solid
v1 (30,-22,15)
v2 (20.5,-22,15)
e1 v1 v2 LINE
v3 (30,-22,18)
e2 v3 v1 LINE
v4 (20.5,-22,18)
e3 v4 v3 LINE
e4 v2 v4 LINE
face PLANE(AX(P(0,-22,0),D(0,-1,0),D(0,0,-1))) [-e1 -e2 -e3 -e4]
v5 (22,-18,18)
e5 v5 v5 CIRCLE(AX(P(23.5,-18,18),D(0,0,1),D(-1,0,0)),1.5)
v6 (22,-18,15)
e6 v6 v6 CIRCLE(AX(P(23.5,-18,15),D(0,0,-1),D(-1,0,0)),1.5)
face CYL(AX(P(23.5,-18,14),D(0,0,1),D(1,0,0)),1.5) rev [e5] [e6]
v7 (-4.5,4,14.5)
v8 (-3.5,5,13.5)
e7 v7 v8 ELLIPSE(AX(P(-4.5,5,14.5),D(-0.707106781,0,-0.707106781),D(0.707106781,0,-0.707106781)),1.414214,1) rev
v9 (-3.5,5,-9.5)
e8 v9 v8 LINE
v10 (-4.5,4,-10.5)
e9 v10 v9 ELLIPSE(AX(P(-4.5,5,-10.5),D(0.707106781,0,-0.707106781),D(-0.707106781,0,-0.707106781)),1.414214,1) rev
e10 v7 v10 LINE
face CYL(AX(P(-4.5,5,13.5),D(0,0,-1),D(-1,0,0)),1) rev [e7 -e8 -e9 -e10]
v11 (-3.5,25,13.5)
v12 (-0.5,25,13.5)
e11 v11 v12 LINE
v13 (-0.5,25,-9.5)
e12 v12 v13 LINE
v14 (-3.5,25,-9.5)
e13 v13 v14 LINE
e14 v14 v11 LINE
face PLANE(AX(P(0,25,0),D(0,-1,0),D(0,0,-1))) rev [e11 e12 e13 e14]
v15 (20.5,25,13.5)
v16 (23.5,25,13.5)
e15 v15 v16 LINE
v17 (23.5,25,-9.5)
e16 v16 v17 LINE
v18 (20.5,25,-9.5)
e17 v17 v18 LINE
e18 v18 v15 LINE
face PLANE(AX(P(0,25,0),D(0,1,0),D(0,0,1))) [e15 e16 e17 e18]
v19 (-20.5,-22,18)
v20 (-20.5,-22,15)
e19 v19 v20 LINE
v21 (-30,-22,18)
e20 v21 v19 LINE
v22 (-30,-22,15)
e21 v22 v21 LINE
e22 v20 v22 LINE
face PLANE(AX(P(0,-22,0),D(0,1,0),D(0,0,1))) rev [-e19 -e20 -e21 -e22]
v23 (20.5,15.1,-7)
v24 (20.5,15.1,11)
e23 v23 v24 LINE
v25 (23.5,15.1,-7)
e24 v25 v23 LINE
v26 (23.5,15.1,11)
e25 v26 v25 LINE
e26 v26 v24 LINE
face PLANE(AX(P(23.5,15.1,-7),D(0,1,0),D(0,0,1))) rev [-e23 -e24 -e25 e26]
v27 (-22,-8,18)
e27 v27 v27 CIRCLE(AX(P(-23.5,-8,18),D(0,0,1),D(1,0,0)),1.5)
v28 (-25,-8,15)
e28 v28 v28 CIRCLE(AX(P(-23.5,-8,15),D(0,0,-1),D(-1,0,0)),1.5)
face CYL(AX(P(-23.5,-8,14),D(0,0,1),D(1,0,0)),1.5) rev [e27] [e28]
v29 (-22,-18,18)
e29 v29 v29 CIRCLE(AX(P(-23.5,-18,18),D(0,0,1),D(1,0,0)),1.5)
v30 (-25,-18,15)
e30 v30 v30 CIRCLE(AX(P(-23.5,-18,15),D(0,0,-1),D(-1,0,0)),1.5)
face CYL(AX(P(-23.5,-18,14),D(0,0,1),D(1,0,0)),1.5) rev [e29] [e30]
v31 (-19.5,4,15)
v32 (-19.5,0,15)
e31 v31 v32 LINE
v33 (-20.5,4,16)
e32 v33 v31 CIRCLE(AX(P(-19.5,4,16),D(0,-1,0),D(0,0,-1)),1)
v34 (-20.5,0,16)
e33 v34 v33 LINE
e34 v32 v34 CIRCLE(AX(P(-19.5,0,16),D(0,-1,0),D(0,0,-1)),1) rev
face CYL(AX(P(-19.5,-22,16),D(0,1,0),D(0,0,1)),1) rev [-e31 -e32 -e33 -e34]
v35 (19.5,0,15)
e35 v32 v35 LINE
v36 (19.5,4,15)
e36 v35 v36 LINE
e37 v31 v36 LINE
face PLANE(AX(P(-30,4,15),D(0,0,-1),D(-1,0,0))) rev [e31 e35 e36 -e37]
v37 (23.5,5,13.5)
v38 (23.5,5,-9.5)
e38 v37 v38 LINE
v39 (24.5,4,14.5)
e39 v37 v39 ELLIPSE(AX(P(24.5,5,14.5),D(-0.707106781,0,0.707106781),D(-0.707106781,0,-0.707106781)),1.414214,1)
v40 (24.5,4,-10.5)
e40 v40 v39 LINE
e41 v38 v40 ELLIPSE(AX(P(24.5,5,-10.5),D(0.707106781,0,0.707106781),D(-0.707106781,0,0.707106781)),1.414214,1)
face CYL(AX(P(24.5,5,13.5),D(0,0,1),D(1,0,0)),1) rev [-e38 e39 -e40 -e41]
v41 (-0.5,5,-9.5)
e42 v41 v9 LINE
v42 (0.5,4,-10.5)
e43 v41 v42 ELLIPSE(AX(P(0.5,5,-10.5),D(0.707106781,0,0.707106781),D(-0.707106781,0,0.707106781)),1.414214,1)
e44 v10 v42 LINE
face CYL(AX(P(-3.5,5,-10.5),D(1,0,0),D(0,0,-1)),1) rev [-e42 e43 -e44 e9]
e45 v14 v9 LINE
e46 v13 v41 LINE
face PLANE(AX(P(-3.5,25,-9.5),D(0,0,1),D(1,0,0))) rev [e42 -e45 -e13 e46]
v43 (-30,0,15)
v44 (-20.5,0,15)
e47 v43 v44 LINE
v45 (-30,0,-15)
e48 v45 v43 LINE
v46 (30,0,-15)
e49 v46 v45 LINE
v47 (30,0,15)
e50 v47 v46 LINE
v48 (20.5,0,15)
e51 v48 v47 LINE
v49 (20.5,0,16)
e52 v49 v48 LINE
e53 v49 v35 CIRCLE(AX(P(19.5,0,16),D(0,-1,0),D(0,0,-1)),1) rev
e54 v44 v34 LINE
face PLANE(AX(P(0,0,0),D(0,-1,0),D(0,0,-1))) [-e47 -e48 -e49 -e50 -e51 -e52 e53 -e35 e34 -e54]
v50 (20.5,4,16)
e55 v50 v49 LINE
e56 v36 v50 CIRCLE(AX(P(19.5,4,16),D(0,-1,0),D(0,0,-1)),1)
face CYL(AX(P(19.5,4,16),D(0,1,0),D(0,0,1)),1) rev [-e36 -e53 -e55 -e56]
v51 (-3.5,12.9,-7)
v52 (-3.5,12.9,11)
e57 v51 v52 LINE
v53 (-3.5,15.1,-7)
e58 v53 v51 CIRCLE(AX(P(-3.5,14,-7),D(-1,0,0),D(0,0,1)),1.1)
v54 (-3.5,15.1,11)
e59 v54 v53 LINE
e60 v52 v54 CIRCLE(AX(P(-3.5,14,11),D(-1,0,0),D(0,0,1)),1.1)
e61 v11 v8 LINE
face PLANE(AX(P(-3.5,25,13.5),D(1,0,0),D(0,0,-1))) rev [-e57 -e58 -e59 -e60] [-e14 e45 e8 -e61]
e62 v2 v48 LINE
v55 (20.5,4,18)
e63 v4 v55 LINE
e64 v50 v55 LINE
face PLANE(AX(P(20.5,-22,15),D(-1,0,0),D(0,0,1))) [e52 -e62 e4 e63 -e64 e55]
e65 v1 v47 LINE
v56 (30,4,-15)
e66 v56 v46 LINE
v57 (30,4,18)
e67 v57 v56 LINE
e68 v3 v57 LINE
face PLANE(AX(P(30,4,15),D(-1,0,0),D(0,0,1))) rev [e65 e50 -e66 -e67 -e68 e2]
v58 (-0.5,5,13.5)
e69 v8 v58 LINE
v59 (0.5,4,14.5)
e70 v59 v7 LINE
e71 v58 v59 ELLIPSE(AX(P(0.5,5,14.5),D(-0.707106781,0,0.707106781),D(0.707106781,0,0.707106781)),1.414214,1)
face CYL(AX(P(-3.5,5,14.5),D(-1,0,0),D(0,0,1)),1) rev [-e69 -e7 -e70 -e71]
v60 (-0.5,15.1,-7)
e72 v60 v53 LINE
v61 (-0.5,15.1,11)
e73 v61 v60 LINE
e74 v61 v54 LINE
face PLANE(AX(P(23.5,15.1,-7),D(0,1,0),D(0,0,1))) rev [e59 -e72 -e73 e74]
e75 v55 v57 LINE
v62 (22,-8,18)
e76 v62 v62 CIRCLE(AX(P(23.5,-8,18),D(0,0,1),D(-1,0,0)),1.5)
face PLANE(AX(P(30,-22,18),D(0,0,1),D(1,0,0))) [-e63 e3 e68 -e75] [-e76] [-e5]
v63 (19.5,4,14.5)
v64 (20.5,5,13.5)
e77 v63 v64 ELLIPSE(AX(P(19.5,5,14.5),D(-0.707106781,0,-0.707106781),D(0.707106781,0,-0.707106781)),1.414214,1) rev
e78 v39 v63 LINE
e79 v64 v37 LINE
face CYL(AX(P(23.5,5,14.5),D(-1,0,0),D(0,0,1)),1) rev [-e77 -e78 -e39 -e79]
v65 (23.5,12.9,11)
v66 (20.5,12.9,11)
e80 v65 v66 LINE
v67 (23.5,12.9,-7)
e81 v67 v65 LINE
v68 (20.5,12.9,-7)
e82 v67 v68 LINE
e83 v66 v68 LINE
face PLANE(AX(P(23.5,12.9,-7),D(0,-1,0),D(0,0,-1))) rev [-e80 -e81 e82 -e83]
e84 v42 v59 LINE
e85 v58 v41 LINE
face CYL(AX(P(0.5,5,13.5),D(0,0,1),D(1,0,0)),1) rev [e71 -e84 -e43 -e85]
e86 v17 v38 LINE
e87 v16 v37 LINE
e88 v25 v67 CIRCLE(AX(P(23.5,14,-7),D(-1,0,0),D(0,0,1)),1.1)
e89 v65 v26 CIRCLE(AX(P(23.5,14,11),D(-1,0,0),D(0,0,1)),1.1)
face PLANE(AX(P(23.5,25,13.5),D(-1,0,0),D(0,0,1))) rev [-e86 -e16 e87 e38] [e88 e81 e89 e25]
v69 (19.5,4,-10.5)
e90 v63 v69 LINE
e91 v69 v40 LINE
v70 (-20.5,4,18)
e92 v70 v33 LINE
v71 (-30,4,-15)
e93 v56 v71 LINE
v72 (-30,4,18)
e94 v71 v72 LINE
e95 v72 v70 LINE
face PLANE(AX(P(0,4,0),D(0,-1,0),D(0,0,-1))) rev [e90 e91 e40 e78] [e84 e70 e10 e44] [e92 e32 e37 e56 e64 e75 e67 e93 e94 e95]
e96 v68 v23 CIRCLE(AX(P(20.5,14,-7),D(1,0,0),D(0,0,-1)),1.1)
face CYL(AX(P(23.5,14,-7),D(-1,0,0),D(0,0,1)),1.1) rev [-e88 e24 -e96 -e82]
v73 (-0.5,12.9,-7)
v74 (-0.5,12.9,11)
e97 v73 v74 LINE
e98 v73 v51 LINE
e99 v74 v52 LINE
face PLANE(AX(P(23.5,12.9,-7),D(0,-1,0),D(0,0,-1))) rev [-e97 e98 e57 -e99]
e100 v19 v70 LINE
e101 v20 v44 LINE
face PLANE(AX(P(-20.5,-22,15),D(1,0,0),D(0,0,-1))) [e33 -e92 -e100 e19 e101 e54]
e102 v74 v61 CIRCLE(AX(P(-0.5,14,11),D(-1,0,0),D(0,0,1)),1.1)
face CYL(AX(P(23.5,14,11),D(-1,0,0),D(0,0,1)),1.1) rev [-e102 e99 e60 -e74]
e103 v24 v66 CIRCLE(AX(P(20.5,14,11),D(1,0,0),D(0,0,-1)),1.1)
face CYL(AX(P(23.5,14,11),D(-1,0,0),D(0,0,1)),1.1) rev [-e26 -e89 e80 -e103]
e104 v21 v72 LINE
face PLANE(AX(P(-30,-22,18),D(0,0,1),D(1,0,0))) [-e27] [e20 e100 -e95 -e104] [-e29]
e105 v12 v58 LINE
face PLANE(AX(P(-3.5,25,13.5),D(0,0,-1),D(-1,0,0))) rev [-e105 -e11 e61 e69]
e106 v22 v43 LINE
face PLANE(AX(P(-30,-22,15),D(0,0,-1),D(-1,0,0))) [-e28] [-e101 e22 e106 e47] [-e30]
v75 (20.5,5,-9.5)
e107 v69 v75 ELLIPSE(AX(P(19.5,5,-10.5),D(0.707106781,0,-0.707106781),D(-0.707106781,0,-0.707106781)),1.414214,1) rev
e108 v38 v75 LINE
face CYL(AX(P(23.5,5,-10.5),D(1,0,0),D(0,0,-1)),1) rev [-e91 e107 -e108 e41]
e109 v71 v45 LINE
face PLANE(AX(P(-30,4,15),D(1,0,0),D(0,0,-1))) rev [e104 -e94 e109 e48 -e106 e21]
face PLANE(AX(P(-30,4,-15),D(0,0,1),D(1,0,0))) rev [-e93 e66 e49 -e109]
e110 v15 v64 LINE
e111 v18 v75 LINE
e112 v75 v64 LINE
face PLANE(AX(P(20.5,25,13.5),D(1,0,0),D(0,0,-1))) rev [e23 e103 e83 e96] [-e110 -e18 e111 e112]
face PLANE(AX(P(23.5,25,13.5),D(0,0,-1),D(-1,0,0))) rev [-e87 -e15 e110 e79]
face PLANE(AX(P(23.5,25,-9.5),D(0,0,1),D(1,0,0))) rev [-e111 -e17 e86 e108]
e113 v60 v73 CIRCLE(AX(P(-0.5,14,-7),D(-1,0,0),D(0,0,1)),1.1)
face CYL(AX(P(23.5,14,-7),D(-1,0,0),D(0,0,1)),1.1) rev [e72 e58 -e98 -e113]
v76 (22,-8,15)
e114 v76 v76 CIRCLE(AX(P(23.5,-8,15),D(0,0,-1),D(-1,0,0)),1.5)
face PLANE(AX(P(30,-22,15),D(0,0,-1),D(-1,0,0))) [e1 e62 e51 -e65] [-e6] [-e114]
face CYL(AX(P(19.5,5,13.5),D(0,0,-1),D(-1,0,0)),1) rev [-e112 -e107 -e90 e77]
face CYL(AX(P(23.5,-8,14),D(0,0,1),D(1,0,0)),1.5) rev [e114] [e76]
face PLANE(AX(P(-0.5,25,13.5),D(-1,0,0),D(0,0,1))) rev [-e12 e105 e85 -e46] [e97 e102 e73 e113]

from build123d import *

# Parameters (mm, degrees)
SKETCH1_W           = 60
SKETCH1_H           = 30
BOSS_EXTRUDE1_DEPTH = 4
SKETCH2_W           = 9.5
SKETCH2_H           = 3
BOSS_EXTRUDE2_DEPTH = 26
SKETCH3_R           = 1.5
CUT_EXTRUDE1_DEPTH  = 4
SKETCH4_W           = 3
SKETCH4_H           = 23
BOSS_EXTRUDE4_DEPTH = 21
CUT_EXTRUDE2_DEPTH  = 27
FILLET1_R           = 1


with BuildPart() as part:
    # Sketch1 → Boss-Extrude1 (new body)
    with BuildSketch(Plane(origin=(0, 0, 0), x_dir=(1, 0, 0), z_dir=(0, 1, 0))):
        Rectangle(SKETCH1_W, SKETCH1_H)
    extrude(amount=BOSS_EXTRUDE1_DEPTH)

    # Sketch2 → Boss-Extrude2 (add)
    with BuildSketch(Plane(origin=(0, 4, 0), x_dir=(1, 0, 0), z_dir=(0, 1, 0))):
        with Locations((-25.25, -16.5)):
            Rectangle(SKETCH2_W, SKETCH2_H)
        with Locations((25.25, -16.5)):
            Rectangle(SKETCH2_W, SKETCH2_H)
    extrude(amount=-BOSS_EXTRUDE2_DEPTH)

    # Sketch3 → Cut-Extrude1 (cut)
    with BuildSketch(Plane.XY.offset(18)):
        with Locations((-23.5, -8)):
            Circle(SKETCH3_R)
        with Locations((-23.5, -18)):
            Circle(SKETCH3_R)
        with Locations(Location((23.5, -18, 0), (0, 0, 180))):
            Circle(SKETCH3_R)
        with Locations(Location((23.5, -8, 0), (0, 0, 180))):
            Circle(SKETCH3_R)
    extrude(amount=-CUT_EXTRUDE1_DEPTH, mode=Mode.SUBTRACT)

    # Sketch4 → Boss-Extrude4 (add)
    with BuildSketch(Plane(origin=(0, 4, 0), x_dir=(1, 0, 0), z_dir=(0, 1, 0))):
        with Locations((-2, -2)):
            Rectangle(SKETCH4_W, SKETCH4_H)
        with Locations((22, -2)):
            Rectangle(SKETCH4_W, SKETCH4_H)
    extrude(amount=BOSS_EXTRUDE4_DEPTH)

    # Sketch5 → Cut-Extrude2 (cut)
    with BuildSketch(Plane.ZY.offset(3.5)):
        with BuildLine():
            Line((-7, 15.1), (11, 15.1))
            ThreePointArc((11, 15.1), (12.1, 14), (11, 12.9))
            Line((11, 12.9), (-7, 12.9))
            ThreePointArc((-7, 12.9), (-8.1, 14), (-7, 15.1))
        make_face()
    extrude(amount=-CUT_EXTRUDE2_DEPTH, mode=Mode.SUBTRACT)

    # Fillet1
    # the kernel refuses this fillet: 1 mm, written as the material it adds along each edge
    with BuildSketch(Plane(origin=(-20.5, 4, 15), x_dir=(1, 0, 0), z_dir=(0, -1, 0))) as fillet1_piece_1_section:
        with BuildLine():
            CenterArc((FILLET1_R, FILLET1_R), FILLET1_R, 180, 90)
            Line((0, FILLET1_R), (-FILLET1_R * 0.02, FILLET1_R))
            Line((-FILLET1_R * 0.02, FILLET1_R), (-FILLET1_R * 0.02, -FILLET1_R * 0.02))
            Line((-FILLET1_R * 0.02, -FILLET1_R * 0.02), (FILLET1_R, -FILLET1_R * 0.02))
            Line((FILLET1_R, -FILLET1_R * 0.02), (FILLET1_R, 0))
        make_face()
    fillet1_piece_1 = extrude(amount=4, mode=Mode.PRIVATE)
    fillet1_piece_1 = split(fillet1_piece_1, bisect_by=Plane(origin=(-20.29652687, 2, 15), z_dir=(0, 0, 1)), keep=Keep.TOP, mode=Mode.PRIVATE)
    add(fillet1_piece_1)
    with BuildSketch(Plane(origin=(20.5, 4, 15), x_dir=(-1, 0, 0), z_dir=(0, -1, 0))) as fillet1_piece_2_section:
        with BuildLine():
            CenterArc((FILLET1_R, -FILLET1_R), FILLET1_R, 90, 90)
            Line((0, -FILLET1_R), (-FILLET1_R * 0.02, -FILLET1_R))
            Line((-FILLET1_R * 0.02, -FILLET1_R), (-FILLET1_R * 0.02, FILLET1_R * 0.02))
            Line((-FILLET1_R * 0.02, FILLET1_R * 0.02), (FILLET1_R, FILLET1_R * 0.02))
            Line((FILLET1_R, FILLET1_R * 0.02), (FILLET1_R, 0))
        make_face()
    fillet1_piece_2 = extrude(amount=4, mode=Mode.PRIVATE)
    fillet1_piece_2 = split(fillet1_piece_2, bisect_by=Plane(origin=(20.29652687, 2, 15), z_dir=(0, 0, 1)), keep=Keep.TOP, mode=Mode.PRIVATE)
    add(fillet1_piece_2)
    with BuildSketch(Plane(origin=(-0.5, 4, 13.5), x_dir=(1, 0, 0), z_dir=(0, 0, -1)), Plane(origin=(-3.5, 4, -9.5), x_dir=(-1, 0, 0), z_dir=(0, 0, 1)), Plane(origin=(23.5, 4, 13.5), x_dir=(1, 0, 0), z_dir=(0, 0, -1)), Plane(origin=(20.5, 4, -9.5), x_dir=(-1, 0, 0), z_dir=(0, 0, 1))) as fillet1_piece_3:
        with BuildLine():
            CenterArc((FILLET1_R, -FILLET1_R), FILLET1_R, 90, 90)
            Line((0, -FILLET1_R), (-FILLET1_R * 0.02, -FILLET1_R))
            Line((-FILLET1_R * 0.02, -FILLET1_R), (-FILLET1_R * 0.02, FILLET1_R * 0.02))
            Line((-FILLET1_R * 0.02, FILLET1_R * 0.02), (FILLET1_R, FILLET1_R * 0.02))
            Line((FILLET1_R, FILLET1_R * 0.02), (FILLET1_R, 0))
        make_face()
    extrude(amount=23)
    with BuildSketch(Plane(origin=(-0.5, 4, -9.5), x_dir=(0, 0, -1), z_dir=(-1, 0, 0)), Plane(origin=(-3.5, 4, 13.5), x_dir=(0, 0, 1), z_dir=(1, 0, 0)), Plane(origin=(23.5, 4, -9.5), x_dir=(0, 0, -1), z_dir=(-1, 0, 0)), Plane(origin=(20.5, 4, 13.5), x_dir=(0, 0, 1), z_dir=(1, 0, 0))) as fillet1_piece_4:
        with BuildLine():
            CenterArc((FILLET1_R, -FILLET1_R), FILLET1_R, 90, 90)
            Line((0, -FILLET1_R), (-FILLET1_R * 0.02, -FILLET1_R))
            Line((-FILLET1_R * 0.02, -FILLET1_R), (-FILLET1_R * 0.02, FILLET1_R * 0.02))
            Line((-FILLET1_R * 0.02, FILLET1_R * 0.02), (FILLET1_R, FILLET1_R * 0.02))
            Line((FILLET1_R, FILLET1_R * 0.02), (FILLET1_R, 0))
        make_face()
    extrude(amount=3)
    with BuildSketch(Plane(origin=(-3.5, 4, 13.5), x_dir=(0, 0, 1), z_dir=(1, 0, 0))) as fillet1_piece_5a_section:
        with BuildLine():
            CenterArc((FILLET1_R, -FILLET1_R), FILLET1_R, 90, 90)
            Line((0, -FILLET1_R), (-FILLET1_R * 0.02, -FILLET1_R))
            Line((-FILLET1_R * 0.02, -FILLET1_R), (-FILLET1_R * 0.02, FILLET1_R * 0.02))
            Line((-FILLET1_R * 0.02, FILLET1_R * 0.02), (FILLET1_R, FILLET1_R * 0.02))
            Line((FILLET1_R, FILLET1_R * 0.02), (FILLET1_R, 0))
        make_face()
    fillet1_piece_5a = extrude(amount=5.5, mode=Mode.PRIVATE)
    fillet1_piece_5a = split(fillet1_piece_5a, bisect_by=Plane(origin=(-0.5, 4.226395114, 13.726395114), z_dir=(1, 0, 0)), keep=Keep.TOP, mode=Mode.PRIVATE)
    with BuildSketch(Plane(origin=(-0.5, 4, 16), x_dir=(1, 0, 0), z_dir=(0, 0, -1))) as fillet1_piece_5b_section:
        with BuildLine():
            CenterArc((FILLET1_R, -FILLET1_R), FILLET1_R, 90, 90)
            Line((0, -FILLET1_R), (-FILLET1_R * 0.02, -FILLET1_R))
            Line((-FILLET1_R * 0.02, -FILLET1_R), (-FILLET1_R * 0.02, FILLET1_R * 0.02))
            Line((-FILLET1_R * 0.02, FILLET1_R * 0.02), (FILLET1_R, FILLET1_R * 0.02))
            Line((FILLET1_R, FILLET1_R * 0.02), (FILLET1_R, 0))
        make_face()
    fillet1_piece_5b = extrude(amount=25.5, mode=Mode.PRIVATE)
    fillet1_piece_5b = split(fillet1_piece_5b, bisect_by=Plane(origin=(-0.273604886, 4.226395114, 13.5), z_dir=(0, 0, 1)), keep=Keep.TOP, mode=Mode.PRIVATE)
    fillet1_piece_5 = fillet1_piece_5a & fillet1_piece_5b
    add(fillet1_piece_5)
    with BuildSketch(Plane(origin=(-0.5, 4, 13.5), x_dir=(1, 0, 0), z_dir=(0, 0, -1))) as fillet1_piece_6a_section:
        with BuildLine():
            CenterArc((FILLET1_R, -FILLET1_R), FILLET1_R, 90, 90)
            Line((0, -FILLET1_R), (-FILLET1_R * 0.02, -FILLET1_R))
            Line((-FILLET1_R * 0.02, -FILLET1_R), (-FILLET1_R * 0.02, FILLET1_R * 0.02))
            Line((-FILLET1_R * 0.02, FILLET1_R * 0.02), (FILLET1_R, FILLET1_R * 0.02))
            Line((FILLET1_R, FILLET1_R * 0.02), (FILLET1_R, 0))
        make_face()
    fillet1_piece_6a = extrude(amount=25.5, mode=Mode.PRIVATE)
    fillet1_piece_6a = split(fillet1_piece_6a, bisect_by=Plane(origin=(-0.273604886, 4.226395114, -9.5), z_dir=(0, 0, -1)), keep=Keep.TOP, mode=Mode.PRIVATE)
    with BuildSketch(Plane(origin=(2, 4, -9.5), x_dir=(0, 0, -1), z_dir=(-1, 0, 0))) as fillet1_piece_6b_section:
        with BuildLine():
            CenterArc((FILLET1_R, -FILLET1_R), FILLET1_R, 90, 90)
            Line((0, -FILLET1_R), (-FILLET1_R * 0.02, -FILLET1_R))
            Line((-FILLET1_R * 0.02, -FILLET1_R), (-FILLET1_R * 0.02, FILLET1_R * 0.02))
            Line((-FILLET1_R * 0.02, FILLET1_R * 0.02), (FILLET1_R, FILLET1_R * 0.02))
            Line((FILLET1_R, FILLET1_R * 0.02), (FILLET1_R, 0))
        make_face()
    fillet1_piece_6b = extrude(amount=5.5, mode=Mode.PRIVATE)
    fillet1_piece_6b = split(fillet1_piece_6b, bisect_by=Plane(origin=(-0.5, 4.226395114, -9.726395114), z_dir=(1, 0, 0)), keep=Keep.TOP, mode=Mode.PRIVATE)
    fillet1_piece_6 = fillet1_piece_6a & fillet1_piece_6b
    add(fillet1_piece_6)
    with BuildSketch(Plane(origin=(-0.5, 4, -9.5), x_dir=(0, 0, -1), z_dir=(-1, 0, 0))) as fillet1_piece_7a_section:
        with BuildLine():
            CenterArc((FILLET1_R, -FILLET1_R), FILLET1_R, 90, 90)
            Line((0, -FILLET1_R), (-FILLET1_R * 0.02, -FILLET1_R))
            Line((-FILLET1_R * 0.02, -FILLET1_R), (-FILLET1_R * 0.02, FILLET1_R * 0.02))
            Line((-FILLET1_R * 0.02, FILLET1_R * 0.02), (FILLET1_R, FILLET1_R * 0.02))
            Line((FILLET1_R, FILLET1_R * 0.02), (FILLET1_R, 0))
        make_face()
    fillet1_piece_7a = extrude(amount=5.5, mode=Mode.PRIVATE)
    fillet1_piece_7a = split(fillet1_piece_7a, bisect_by=Plane(origin=(-3.5, 4.226395114, -9.726395114), z_dir=(-1, 0, 0)), keep=Keep.TOP, mode=Mode.PRIVATE)
    with BuildSketch(Plane(origin=(-3.5, 4, -12), x_dir=(-1, 0, 0), z_dir=(0, 0, 1))) as fillet1_piece_7b_section:
        with BuildLine():
            CenterArc((FILLET1_R, -FILLET1_R), FILLET1_R, 90, 90)
            Line((0, -FILLET1_R), (-FILLET1_R * 0.02, -FILLET1_R))
            Line((-FILLET1_R * 0.02, -FILLET1_R), (-FILLET1_R * 0.02, FILLET1_R * 0.02))
            Line((-FILLET1_R * 0.02, FILLET1_R * 0.02), (FILLET1_R, FILLET1_R * 0.02))
            Line((FILLET1_R, FILLET1_R * 0.02), (FILLET1_R, 0))
        make_face()
    fillet1_piece_7b = extrude(amount=25.5, mode=Mode.PRIVATE)
    fillet1_piece_7b = split(fillet1_piece_7b, bisect_by=Plane(origin=(-3.726395114, 4.226395114, -9.5), z_dir=(0, 0, -1)), keep=Keep.TOP, mode=Mode.PRIVATE)
    fillet1_piece_7 = fillet1_piece_7a & fillet1_piece_7b
    add(fillet1_piece_7)
    with BuildSketch(Plane(origin=(-6, 4, 13.5), x_dir=(0, 0, 1), z_dir=(1, 0, 0))) as fillet1_piece_8a_section:
        with BuildLine():
            CenterArc((FILLET1_R, -FILLET1_R), FILLET1_R, 90, 90)
            Line((0, -FILLET1_R), (-FILLET1_R * 0.02, -FILLET1_R))
            Line((-FILLET1_R * 0.02, -FILLET1_R), (-FILLET1_R * 0.02, FILLET1_R * 0.02))
            Line((-FILLET1_R * 0.02, FILLET1_R * 0.02), (FILLET1_R, FILLET1_R * 0.02))
            Line((FILLET1_R, FILLET1_R * 0.02), (FILLET1_R, 0))
        make_face()
    fillet1_piece_8a = extrude(amount=5.5, mode=Mode.PRIVATE)
    fillet1_piece_8a = split(fillet1_piece_8a, bisect_by=Plane(origin=(-3.5, 4.226395114, 13.726395114), z_dir=(-1, 0, 0)), keep=Keep.TOP, mode=Mode.PRIVATE)
    with BuildSketch(Plane(origin=(-3.5, 4, -9.5), x_dir=(-1, 0, 0), z_dir=(0, 0, 1))) as fillet1_piece_8b_section:
        with BuildLine():
            CenterArc((FILLET1_R, -FILLET1_R), FILLET1_R, 90, 90)
            Line((0, -FILLET1_R), (-FILLET1_R * 0.02, -FILLET1_R))
            Line((-FILLET1_R * 0.02, -FILLET1_R), (-FILLET1_R * 0.02, FILLET1_R * 0.02))
            Line((-FILLET1_R * 0.02, FILLET1_R * 0.02), (FILLET1_R, FILLET1_R * 0.02))
            Line((FILLET1_R, FILLET1_R * 0.02), (FILLET1_R, 0))
        make_face()
    fillet1_piece_8b = extrude(amount=25.5, mode=Mode.PRIVATE)
    fillet1_piece_8b = split(fillet1_piece_8b, bisect_by=Plane(origin=(-3.726395114, 4.226395114, 13.5), z_dir=(0, 0, 1)), keep=Keep.TOP, mode=Mode.PRIVATE)
    fillet1_piece_8 = fillet1_piece_8a & fillet1_piece_8b
    add(fillet1_piece_8)
    with BuildSketch(Plane(origin=(20.5, 4, 13.5), x_dir=(0, 0, 1), z_dir=(1, 0, 0))) as fillet1_piece_9a_section:
        with BuildLine():
            CenterArc((FILLET1_R, -FILLET1_R), FILLET1_R, 90, 90)
            Line((0, -FILLET1_R), (-FILLET1_R * 0.02, -FILLET1_R))
            Line((-FILLET1_R * 0.02, -FILLET1_R), (-FILLET1_R * 0.02, FILLET1_R * 0.02))
            Line((-FILLET1_R * 0.02, FILLET1_R * 0.02), (FILLET1_R, FILLET1_R * 0.02))
            Line((FILLET1_R, FILLET1_R * 0.02), (FILLET1_R, 0))
        make_face()
    fillet1_piece_9a = extrude(amount=5.5, mode=Mode.PRIVATE)
    fillet1_piece_9a = split(fillet1_piece_9a, bisect_by=Plane(origin=(23.5, 4.226395114, 13.726395114), z_dir=(1, 0, 0)), keep=Keep.TOP, mode=Mode.PRIVATE)
    with BuildSketch(Plane(origin=(23.5, 4, 16), x_dir=(1, 0, 0), z_dir=(0, 0, -1))) as fillet1_piece_9b_section:
        with BuildLine():
            CenterArc((FILLET1_R, -FILLET1_R), FILLET1_R, 90, 90)
            Line((0, -FILLET1_R), (-FILLET1_R * 0.02, -FILLET1_R))
            Line((-FILLET1_R * 0.02, -FILLET1_R), (-FILLET1_R * 0.02, FILLET1_R * 0.02))
            Line((-FILLET1_R * 0.02, FILLET1_R * 0.02), (FILLET1_R, FILLET1_R * 0.02))
            Line((FILLET1_R, FILLET1_R * 0.02), (FILLET1_R, 0))
        make_face()
    fillet1_piece_9b = extrude(amount=25.5, mode=Mode.PRIVATE)
    fillet1_piece_9b = split(fillet1_piece_9b, bisect_by=Plane(origin=(23.726395114, 4.226395114, 13.5), z_dir=(0, 0, 1)), keep=Keep.TOP, mode=Mode.PRIVATE)
    fillet1_piece_9 = fillet1_piece_9a & fillet1_piece_9b
    add(fillet1_piece_9)
    with BuildSketch(Plane(origin=(26, 4, -9.5), x_dir=(0, 0, -1), z_dir=(-1, 0, 0))) as fillet1_piece_10a_section:
        with BuildLine():
            CenterArc((FILLET1_R, -FILLET1_R), FILLET1_R, 90, 90)
            Line((0, -FILLET1_R), (-FILLET1_R * 0.02, -FILLET1_R))
            Line((-FILLET1_R * 0.02, -FILLET1_R), (-FILLET1_R * 0.02, FILLET1_R * 0.02))
            Line((-FILLET1_R * 0.02, FILLET1_R * 0.02), (FILLET1_R, FILLET1_R * 0.02))
            Line((FILLET1_R, FILLET1_R * 0.02), (FILLET1_R, 0))
        make_face()
    fillet1_piece_10a = extrude(amount=5.5, mode=Mode.PRIVATE)
    fillet1_piece_10a = split(fillet1_piece_10a, bisect_by=Plane(origin=(23.5, 4.226395114, -9.726395114), z_dir=(1, 0, 0)), keep=Keep.TOP, mode=Mode.PRIVATE)
    with BuildSketch(Plane(origin=(23.5, 4, 13.5), x_dir=(1, 0, 0), z_dir=(0, 0, -1))) as fillet1_piece_10b_section:
        with BuildLine():
            CenterArc((FILLET1_R, -FILLET1_R), FILLET1_R, 90, 90)
            Line((0, -FILLET1_R), (-FILLET1_R * 0.02, -FILLET1_R))
            Line((-FILLET1_R * 0.02, -FILLET1_R), (-FILLET1_R * 0.02, FILLET1_R * 0.02))
            Line((-FILLET1_R * 0.02, FILLET1_R * 0.02), (FILLET1_R, FILLET1_R * 0.02))
            Line((FILLET1_R, FILLET1_R * 0.02), (FILLET1_R, 0))
        make_face()
    fillet1_piece_10b = extrude(amount=25.5, mode=Mode.PRIVATE)
    fillet1_piece_10b = split(fillet1_piece_10b, bisect_by=Plane(origin=(23.726395114, 4.226395114, -9.5), z_dir=(0, 0, -1)), keep=Keep.TOP, mode=Mode.PRIVATE)
    fillet1_piece_10 = fillet1_piece_10a & fillet1_piece_10b
    add(fillet1_piece_10)
    with BuildSketch(Plane(origin=(23.5, 4, -9.5), x_dir=(0, 0, -1), z_dir=(-1, 0, 0))) as fillet1_piece_11a_section:
        with BuildLine():
            CenterArc((FILLET1_R, -FILLET1_R), FILLET1_R, 90, 90)
            Line((0, -FILLET1_R), (-FILLET1_R * 0.02, -FILLET1_R))
            Line((-FILLET1_R * 0.02, -FILLET1_R), (-FILLET1_R * 0.02, FILLET1_R * 0.02))
            Line((-FILLET1_R * 0.02, FILLET1_R * 0.02), (FILLET1_R, FILLET1_R * 0.02))
            Line((FILLET1_R, FILLET1_R * 0.02), (FILLET1_R, 0))
        make_face()
    fillet1_piece_11a = extrude(amount=5.5, mode=Mode.PRIVATE)
    fillet1_piece_11a = split(fillet1_piece_11a, bisect_by=Plane(origin=(20.5, 4.226395114, -9.726395114), z_dir=(-1, 0, 0)), keep=Keep.TOP, mode=Mode.PRIVATE)
    with BuildSketch(Plane(origin=(20.5, 4, -12), x_dir=(-1, 0, 0), z_dir=(0, 0, 1))) as fillet1_piece_11b_section:
        with BuildLine():
            CenterArc((FILLET1_R, -FILLET1_R), FILLET1_R, 90, 90)
            Line((0, -FILLET1_R), (-FILLET1_R * 0.02, -FILLET1_R))
            Line((-FILLET1_R * 0.02, -FILLET1_R), (-FILLET1_R * 0.02, FILLET1_R * 0.02))
            Line((-FILLET1_R * 0.02, FILLET1_R * 0.02), (FILLET1_R, FILLET1_R * 0.02))
            Line((FILLET1_R, FILLET1_R * 0.02), (FILLET1_R, 0))
        make_face()
    fillet1_piece_11b = extrude(amount=25.5, mode=Mode.PRIVATE)
    fillet1_piece_11b = split(fillet1_piece_11b, bisect_by=Plane(origin=(20.273604886, 4.226395114, -9.5), z_dir=(0, 0, -1)), keep=Keep.TOP, mode=Mode.PRIVATE)
    fillet1_piece_11 = fillet1_piece_11a & fillet1_piece_11b
    add(fillet1_piece_11)
    with BuildSketch(Plane(origin=(20.5, 4, -9.5), x_dir=(-1, 0, 0), z_dir=(0, 0, 1))) as fillet1_piece_12a_section:
        with BuildLine():
            CenterArc((FILLET1_R, -FILLET1_R), FILLET1_R, 90, 90)
            Line((0, -FILLET1_R), (-FILLET1_R * 0.02, -FILLET1_R))
            Line((-FILLET1_R * 0.02, -FILLET1_R), (-FILLET1_R * 0.02, FILLET1_R * 0.02))
            Line((-FILLET1_R * 0.02, FILLET1_R * 0.02), (FILLET1_R, FILLET1_R * 0.02))
            Line((FILLET1_R, FILLET1_R * 0.02), (FILLET1_R, 0))
        make_face()
    fillet1_piece_12a = extrude(amount=25.5, mode=Mode.PRIVATE)
    fillet1_piece_12a = split(fillet1_piece_12a, bisect_by=Plane(origin=(20.273604886, 4.226395114, 13.5), z_dir=(0, 0, 1)), keep=Keep.TOP, mode=Mode.PRIVATE)
    with BuildSketch(Plane(origin=(18, 4, 13.5), x_dir=(0, 0, 1), z_dir=(1, 0, 0))) as fillet1_piece_12b_section:
        with BuildLine():
            CenterArc((FILLET1_R, -FILLET1_R), FILLET1_R, 90, 90)
            Line((0, -FILLET1_R), (-FILLET1_R * 0.02, -FILLET1_R))
            Line((-FILLET1_R * 0.02, -FILLET1_R), (-FILLET1_R * 0.02, FILLET1_R * 0.02))
            Line((-FILLET1_R * 0.02, FILLET1_R * 0.02), (FILLET1_R, FILLET1_R * 0.02))
            Line((FILLET1_R, FILLET1_R * 0.02), (FILLET1_R, 0))
        make_face()
    fillet1_piece_12b = extrude(amount=5.5, mode=Mode.PRIVATE)
    fillet1_piece_12b = split(fillet1_piece_12b, bisect_by=Plane(origin=(20.5, 4.226395114, 13.726395114), z_dir=(-1, 0, 0)), keep=Keep.TOP, mode=Mode.PRIVATE)
    fillet1_piece_12 = fillet1_piece_12a & fillet1_piece_12b
    add(fillet1_piece_12)


solid = part.part
